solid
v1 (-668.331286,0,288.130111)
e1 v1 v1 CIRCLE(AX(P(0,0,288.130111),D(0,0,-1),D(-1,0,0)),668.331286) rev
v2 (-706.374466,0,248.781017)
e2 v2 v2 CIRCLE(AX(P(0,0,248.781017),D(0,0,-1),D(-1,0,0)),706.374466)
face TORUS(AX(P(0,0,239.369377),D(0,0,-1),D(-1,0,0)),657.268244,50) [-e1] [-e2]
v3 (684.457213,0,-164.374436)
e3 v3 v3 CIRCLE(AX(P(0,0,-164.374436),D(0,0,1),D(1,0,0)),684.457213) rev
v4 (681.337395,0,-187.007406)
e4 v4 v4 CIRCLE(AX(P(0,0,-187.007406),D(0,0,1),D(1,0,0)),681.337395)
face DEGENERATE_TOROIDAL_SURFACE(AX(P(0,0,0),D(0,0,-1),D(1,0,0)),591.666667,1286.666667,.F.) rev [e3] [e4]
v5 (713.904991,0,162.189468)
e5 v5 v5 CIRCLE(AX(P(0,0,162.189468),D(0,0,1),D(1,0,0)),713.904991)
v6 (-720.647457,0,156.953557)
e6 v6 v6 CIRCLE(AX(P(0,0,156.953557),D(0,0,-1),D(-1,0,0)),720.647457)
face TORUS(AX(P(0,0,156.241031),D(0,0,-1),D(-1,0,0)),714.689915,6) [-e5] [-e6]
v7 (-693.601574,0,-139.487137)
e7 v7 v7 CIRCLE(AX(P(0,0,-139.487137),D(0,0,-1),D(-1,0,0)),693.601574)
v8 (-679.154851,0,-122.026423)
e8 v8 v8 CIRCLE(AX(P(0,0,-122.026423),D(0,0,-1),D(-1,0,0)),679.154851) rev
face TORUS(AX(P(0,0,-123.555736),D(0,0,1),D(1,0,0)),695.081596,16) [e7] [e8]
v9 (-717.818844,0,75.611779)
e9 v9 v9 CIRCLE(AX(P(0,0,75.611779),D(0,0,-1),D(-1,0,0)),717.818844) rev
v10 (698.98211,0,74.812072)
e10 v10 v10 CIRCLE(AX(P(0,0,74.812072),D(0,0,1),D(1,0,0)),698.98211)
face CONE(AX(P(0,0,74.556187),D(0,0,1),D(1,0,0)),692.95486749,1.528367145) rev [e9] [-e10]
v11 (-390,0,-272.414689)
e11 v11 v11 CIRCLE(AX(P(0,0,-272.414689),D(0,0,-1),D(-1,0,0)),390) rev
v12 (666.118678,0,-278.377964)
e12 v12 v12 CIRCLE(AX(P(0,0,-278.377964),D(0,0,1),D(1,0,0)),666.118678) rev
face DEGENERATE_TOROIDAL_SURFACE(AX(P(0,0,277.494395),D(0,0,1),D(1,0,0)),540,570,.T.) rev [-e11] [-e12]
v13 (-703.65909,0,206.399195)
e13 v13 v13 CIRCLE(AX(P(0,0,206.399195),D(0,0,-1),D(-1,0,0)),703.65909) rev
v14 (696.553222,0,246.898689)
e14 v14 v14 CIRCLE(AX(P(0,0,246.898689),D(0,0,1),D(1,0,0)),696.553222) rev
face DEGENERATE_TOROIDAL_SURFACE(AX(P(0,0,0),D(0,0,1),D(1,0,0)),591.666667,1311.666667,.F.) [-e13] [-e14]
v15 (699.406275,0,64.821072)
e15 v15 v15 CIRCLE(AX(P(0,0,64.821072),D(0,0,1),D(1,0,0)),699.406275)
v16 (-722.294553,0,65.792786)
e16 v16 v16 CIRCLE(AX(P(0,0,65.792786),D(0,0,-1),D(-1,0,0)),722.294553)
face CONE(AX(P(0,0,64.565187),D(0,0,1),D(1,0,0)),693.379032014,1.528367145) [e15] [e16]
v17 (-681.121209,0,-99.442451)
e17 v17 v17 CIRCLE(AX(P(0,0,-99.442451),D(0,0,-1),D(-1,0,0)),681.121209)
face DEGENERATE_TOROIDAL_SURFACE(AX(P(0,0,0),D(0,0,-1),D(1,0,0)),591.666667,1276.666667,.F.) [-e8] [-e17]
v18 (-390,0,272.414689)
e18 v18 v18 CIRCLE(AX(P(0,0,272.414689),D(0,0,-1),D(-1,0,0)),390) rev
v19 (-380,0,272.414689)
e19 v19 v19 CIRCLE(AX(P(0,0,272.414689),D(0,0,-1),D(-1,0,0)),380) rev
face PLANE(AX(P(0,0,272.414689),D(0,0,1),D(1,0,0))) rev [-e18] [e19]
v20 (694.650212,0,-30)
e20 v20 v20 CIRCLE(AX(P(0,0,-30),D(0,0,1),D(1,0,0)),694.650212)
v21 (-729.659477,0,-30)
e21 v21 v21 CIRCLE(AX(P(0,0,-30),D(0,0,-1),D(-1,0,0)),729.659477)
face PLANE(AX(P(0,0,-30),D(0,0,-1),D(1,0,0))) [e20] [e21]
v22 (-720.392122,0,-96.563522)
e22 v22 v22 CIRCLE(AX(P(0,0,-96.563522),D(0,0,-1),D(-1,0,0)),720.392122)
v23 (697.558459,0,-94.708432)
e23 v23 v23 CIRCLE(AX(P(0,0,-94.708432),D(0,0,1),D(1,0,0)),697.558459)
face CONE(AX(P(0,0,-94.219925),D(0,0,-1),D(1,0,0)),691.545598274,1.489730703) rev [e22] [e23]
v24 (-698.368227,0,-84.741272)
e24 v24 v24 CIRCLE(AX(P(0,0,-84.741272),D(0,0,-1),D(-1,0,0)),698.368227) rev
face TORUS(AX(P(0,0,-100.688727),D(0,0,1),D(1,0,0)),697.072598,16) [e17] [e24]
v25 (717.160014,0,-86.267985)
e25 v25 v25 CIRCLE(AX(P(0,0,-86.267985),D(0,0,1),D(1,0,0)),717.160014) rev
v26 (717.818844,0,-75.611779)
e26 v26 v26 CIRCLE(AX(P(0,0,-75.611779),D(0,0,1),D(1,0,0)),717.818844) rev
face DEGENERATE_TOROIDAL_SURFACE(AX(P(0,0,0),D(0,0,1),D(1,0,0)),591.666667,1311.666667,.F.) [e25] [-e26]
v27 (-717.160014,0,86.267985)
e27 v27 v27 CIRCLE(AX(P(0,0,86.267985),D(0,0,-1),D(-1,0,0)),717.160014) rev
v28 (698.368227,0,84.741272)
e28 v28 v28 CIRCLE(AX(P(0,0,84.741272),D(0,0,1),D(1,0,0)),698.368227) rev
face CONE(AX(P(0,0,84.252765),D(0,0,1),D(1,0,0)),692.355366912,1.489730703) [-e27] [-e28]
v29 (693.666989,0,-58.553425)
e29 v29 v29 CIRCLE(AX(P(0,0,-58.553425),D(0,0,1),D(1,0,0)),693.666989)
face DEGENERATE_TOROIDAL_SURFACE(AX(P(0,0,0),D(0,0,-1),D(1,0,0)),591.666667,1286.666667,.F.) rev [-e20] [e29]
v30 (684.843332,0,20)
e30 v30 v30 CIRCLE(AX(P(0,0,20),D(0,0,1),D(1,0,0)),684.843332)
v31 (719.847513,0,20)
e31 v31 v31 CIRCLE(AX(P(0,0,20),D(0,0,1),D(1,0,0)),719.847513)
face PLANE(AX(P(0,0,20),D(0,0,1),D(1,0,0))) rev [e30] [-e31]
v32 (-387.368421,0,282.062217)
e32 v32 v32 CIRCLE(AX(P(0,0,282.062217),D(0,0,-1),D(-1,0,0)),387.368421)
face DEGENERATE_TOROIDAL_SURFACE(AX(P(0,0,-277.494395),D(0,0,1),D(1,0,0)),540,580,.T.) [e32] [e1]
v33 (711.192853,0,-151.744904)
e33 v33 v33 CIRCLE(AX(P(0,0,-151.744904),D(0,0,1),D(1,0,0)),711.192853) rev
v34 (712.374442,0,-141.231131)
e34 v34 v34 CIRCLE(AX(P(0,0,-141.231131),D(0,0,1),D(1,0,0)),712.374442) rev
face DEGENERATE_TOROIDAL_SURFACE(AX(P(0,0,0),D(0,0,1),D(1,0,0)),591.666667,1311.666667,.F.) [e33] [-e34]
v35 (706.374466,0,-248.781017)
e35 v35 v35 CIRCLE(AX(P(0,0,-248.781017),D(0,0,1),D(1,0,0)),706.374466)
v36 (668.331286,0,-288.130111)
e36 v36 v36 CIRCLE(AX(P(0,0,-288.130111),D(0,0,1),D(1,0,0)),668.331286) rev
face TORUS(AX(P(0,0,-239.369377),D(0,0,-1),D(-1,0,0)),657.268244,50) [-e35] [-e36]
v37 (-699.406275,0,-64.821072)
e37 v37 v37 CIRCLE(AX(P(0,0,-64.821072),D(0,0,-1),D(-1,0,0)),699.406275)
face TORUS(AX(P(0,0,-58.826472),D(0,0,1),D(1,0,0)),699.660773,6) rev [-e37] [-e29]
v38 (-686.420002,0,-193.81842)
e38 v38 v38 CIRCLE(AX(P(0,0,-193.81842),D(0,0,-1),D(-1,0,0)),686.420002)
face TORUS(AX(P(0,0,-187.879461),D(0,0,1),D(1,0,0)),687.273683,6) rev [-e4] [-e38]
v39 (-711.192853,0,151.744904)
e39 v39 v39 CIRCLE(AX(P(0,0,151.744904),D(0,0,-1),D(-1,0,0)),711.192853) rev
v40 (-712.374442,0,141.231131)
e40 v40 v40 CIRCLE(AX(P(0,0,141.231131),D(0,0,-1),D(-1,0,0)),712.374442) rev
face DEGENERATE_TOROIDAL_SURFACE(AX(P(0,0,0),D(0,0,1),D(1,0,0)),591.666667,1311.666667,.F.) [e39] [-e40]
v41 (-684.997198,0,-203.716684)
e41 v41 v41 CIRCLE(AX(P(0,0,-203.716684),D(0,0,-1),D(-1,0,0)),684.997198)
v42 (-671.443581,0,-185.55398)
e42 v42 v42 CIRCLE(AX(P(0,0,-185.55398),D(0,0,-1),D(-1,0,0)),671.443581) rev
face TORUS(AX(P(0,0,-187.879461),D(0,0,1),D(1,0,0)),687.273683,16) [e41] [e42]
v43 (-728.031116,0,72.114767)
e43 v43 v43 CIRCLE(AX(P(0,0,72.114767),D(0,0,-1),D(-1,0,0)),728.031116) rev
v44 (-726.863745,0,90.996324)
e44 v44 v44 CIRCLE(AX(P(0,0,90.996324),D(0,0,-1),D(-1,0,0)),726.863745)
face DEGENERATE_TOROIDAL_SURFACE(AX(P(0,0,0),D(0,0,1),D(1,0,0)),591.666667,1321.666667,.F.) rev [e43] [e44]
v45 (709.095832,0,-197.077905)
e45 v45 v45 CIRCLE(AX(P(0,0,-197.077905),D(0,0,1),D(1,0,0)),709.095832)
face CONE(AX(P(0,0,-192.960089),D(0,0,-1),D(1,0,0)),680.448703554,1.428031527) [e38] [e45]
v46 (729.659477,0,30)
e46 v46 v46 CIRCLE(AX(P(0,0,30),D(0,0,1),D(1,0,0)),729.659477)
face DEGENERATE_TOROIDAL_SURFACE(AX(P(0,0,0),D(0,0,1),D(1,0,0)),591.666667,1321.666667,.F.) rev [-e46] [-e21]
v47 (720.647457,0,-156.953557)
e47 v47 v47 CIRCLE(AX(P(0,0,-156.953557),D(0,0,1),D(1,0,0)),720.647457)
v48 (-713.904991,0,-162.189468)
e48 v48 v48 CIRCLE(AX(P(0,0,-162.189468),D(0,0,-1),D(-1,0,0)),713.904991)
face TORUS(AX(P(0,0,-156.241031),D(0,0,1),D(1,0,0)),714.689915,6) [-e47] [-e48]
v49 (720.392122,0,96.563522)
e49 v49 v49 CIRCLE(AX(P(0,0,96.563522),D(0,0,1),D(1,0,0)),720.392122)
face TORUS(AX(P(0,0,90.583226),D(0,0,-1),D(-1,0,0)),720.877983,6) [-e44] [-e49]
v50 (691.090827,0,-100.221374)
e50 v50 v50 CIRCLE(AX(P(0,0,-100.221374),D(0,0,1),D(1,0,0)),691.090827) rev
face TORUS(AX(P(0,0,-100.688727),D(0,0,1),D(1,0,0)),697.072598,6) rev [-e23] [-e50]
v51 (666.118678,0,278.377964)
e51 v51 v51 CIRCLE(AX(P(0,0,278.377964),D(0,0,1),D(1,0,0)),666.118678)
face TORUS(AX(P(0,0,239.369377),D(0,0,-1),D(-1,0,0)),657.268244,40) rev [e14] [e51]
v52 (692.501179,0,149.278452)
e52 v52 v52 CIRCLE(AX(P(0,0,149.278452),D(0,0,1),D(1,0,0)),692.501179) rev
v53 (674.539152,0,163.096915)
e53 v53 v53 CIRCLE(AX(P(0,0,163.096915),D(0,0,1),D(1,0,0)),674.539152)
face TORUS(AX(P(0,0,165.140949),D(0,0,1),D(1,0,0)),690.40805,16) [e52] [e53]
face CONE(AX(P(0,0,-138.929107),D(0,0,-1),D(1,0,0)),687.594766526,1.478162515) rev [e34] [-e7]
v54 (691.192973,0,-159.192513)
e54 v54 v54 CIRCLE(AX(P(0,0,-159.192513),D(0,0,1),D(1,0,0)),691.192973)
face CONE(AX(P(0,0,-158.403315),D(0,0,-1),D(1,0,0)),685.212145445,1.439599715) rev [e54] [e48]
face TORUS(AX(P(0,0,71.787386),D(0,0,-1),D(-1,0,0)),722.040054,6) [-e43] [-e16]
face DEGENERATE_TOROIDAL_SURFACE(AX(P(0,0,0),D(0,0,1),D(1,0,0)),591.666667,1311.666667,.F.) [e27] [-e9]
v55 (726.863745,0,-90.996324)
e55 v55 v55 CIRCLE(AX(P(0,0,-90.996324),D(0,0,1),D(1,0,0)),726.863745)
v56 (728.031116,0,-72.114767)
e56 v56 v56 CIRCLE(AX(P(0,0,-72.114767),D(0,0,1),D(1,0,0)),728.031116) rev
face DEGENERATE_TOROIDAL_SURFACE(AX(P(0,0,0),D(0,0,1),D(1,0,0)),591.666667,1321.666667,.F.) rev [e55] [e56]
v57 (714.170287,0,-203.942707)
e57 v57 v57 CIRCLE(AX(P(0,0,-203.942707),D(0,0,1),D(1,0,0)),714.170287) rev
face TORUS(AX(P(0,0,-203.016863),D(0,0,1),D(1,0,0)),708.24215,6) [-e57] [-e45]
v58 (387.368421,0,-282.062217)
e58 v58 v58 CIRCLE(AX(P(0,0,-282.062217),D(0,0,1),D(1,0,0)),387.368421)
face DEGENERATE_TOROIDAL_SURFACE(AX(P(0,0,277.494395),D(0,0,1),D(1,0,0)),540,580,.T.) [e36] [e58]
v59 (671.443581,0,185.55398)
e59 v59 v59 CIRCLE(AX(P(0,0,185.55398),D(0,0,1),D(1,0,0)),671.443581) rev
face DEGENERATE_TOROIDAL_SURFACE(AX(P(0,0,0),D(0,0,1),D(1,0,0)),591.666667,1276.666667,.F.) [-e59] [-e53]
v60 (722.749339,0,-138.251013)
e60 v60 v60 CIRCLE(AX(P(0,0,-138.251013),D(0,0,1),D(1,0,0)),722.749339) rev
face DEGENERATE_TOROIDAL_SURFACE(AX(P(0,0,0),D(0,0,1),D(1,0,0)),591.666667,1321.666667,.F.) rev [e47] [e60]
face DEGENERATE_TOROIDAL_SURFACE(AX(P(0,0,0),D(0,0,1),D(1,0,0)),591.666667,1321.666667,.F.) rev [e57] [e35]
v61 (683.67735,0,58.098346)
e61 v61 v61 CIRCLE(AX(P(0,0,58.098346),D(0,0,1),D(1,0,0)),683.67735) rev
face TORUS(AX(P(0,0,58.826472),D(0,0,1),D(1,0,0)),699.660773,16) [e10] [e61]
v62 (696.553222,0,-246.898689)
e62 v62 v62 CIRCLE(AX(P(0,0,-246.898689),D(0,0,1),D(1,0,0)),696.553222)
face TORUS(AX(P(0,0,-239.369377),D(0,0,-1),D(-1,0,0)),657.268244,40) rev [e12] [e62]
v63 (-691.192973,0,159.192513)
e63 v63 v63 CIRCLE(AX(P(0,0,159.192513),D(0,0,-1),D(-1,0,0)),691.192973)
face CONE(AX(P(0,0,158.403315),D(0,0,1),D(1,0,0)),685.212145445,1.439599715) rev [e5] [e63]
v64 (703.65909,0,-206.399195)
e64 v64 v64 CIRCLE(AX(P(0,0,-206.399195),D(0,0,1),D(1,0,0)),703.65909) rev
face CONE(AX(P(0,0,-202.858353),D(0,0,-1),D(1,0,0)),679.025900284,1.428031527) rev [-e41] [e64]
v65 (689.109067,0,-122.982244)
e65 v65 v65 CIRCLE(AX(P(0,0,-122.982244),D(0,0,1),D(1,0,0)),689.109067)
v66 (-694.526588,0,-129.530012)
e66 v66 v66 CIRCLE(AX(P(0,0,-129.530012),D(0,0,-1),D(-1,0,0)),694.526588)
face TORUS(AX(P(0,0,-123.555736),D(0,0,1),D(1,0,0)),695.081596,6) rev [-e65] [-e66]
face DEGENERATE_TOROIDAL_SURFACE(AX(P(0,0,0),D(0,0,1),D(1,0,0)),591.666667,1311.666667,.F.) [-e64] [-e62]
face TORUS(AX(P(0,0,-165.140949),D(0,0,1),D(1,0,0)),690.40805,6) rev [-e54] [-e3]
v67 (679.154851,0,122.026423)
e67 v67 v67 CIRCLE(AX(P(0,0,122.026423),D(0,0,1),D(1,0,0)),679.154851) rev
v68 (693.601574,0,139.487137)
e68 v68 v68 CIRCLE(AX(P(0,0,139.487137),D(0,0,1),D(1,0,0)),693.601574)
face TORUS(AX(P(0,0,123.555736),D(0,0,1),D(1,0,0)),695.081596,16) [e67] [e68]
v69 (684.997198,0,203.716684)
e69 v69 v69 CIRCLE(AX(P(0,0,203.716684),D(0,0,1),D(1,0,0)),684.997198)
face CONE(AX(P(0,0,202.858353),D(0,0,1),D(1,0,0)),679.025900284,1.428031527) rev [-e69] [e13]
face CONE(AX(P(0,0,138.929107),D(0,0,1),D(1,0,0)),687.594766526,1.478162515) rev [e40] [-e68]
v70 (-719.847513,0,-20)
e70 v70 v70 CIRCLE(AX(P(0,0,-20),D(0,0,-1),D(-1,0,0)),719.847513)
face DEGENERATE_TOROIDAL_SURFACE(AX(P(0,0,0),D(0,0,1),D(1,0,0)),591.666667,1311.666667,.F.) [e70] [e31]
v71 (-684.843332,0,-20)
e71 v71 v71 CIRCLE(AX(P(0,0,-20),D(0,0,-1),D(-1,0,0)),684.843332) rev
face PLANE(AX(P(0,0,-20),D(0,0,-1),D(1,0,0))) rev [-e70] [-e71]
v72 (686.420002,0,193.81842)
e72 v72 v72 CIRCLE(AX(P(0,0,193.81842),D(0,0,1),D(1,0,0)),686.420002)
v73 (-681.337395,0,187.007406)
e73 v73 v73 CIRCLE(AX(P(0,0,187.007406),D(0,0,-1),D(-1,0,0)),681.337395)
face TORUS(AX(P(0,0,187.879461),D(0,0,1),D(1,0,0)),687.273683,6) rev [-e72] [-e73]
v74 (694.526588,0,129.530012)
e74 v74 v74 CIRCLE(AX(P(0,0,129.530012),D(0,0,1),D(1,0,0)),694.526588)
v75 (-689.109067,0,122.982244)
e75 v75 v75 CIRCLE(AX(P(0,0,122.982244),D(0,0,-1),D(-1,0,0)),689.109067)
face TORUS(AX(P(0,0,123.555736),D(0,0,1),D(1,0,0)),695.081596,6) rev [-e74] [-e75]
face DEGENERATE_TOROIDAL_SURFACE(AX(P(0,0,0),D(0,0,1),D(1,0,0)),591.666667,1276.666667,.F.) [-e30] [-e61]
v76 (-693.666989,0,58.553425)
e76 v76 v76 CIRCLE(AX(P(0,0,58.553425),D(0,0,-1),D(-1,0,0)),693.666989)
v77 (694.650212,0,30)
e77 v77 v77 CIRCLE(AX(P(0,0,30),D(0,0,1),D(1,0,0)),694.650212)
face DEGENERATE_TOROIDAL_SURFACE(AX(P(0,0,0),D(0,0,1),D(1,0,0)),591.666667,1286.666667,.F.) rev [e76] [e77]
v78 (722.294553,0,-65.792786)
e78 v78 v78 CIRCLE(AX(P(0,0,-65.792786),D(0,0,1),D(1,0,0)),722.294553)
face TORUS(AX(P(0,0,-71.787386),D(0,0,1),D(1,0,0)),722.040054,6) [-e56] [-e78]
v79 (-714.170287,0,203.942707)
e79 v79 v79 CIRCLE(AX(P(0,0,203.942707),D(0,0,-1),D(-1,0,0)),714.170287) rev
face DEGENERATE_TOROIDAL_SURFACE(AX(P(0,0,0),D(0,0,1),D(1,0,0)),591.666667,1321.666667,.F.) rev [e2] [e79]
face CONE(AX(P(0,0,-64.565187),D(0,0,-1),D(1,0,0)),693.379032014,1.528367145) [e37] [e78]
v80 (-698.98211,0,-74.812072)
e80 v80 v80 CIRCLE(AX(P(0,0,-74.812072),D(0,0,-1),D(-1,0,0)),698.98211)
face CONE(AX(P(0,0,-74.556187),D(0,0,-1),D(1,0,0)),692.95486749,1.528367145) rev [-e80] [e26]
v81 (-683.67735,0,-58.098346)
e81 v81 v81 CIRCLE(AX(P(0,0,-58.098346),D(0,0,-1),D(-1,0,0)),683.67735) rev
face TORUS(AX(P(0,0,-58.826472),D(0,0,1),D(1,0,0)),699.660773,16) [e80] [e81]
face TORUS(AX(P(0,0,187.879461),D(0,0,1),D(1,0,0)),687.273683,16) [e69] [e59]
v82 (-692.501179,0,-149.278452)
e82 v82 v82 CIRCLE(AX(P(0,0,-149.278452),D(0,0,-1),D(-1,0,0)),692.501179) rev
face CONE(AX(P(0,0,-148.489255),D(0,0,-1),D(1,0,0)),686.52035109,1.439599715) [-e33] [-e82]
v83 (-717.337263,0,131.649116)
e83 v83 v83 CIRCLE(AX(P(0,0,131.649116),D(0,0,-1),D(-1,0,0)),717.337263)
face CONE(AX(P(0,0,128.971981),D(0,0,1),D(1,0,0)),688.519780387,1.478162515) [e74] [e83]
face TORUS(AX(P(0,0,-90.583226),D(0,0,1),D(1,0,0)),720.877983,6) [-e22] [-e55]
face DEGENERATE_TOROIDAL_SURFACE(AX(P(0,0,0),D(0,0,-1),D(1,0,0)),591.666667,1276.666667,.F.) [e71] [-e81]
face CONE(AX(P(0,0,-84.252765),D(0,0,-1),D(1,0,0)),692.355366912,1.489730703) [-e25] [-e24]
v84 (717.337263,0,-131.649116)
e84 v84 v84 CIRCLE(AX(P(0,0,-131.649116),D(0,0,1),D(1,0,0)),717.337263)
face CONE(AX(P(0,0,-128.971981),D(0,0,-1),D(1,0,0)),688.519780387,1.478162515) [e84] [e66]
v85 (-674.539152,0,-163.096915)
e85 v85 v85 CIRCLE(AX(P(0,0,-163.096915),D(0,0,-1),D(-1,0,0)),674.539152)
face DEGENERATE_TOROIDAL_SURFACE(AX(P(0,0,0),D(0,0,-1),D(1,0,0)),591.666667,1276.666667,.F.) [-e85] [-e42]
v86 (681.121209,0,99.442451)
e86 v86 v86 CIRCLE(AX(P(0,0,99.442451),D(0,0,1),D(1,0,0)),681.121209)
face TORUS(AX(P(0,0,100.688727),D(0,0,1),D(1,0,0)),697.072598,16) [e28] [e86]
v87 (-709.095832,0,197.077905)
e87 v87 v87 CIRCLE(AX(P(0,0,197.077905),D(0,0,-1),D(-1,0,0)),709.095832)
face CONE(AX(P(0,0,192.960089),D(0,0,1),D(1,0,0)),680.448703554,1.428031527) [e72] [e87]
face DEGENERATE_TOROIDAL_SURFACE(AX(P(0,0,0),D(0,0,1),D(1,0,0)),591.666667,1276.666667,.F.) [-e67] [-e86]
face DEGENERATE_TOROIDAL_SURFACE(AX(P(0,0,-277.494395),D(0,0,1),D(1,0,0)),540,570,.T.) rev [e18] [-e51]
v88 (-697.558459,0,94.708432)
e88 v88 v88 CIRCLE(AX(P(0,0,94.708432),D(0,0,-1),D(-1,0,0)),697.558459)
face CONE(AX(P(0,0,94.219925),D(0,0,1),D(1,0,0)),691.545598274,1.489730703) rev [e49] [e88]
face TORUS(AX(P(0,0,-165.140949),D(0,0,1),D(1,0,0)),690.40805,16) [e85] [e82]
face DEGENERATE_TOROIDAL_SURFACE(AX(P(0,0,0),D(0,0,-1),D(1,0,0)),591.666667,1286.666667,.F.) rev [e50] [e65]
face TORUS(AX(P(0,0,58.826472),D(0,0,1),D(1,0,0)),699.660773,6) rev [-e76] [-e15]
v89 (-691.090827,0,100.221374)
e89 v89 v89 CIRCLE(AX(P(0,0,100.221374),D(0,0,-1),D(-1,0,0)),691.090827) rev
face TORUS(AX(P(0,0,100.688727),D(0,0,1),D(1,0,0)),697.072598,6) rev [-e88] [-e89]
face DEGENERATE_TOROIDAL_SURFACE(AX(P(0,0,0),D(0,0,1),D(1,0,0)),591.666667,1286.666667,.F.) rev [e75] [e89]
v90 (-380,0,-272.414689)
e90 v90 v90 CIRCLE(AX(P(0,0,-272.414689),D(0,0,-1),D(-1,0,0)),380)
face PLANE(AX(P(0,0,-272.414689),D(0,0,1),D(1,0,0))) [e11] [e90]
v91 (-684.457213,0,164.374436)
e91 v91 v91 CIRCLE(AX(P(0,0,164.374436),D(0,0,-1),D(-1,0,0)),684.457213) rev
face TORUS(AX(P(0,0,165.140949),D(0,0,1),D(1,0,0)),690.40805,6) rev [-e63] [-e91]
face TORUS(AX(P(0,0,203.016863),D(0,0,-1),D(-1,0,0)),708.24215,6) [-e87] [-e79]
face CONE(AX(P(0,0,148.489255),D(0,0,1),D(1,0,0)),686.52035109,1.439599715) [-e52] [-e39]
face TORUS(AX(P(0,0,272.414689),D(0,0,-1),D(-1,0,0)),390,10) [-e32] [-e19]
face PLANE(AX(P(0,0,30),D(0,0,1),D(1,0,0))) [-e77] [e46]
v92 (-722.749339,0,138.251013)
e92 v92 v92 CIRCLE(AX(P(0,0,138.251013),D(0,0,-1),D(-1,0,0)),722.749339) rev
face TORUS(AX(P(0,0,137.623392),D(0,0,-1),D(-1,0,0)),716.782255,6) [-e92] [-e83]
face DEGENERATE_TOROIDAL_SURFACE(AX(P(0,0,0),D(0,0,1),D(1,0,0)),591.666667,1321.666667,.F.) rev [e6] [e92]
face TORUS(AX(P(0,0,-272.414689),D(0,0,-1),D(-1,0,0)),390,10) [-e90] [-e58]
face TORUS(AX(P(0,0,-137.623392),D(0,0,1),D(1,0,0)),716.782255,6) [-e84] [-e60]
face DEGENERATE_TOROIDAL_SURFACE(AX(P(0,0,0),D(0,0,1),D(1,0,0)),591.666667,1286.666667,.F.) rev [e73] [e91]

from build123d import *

# Parameters (mm, degrees)
FILLET1_R            = 6
FILLET2_R            = 6
FILLET1_OF_MIRROR1_R = 6
FILLET2_OF_MIRROR1_R = 6
FILLET3_R            = 50
FILLET4_R            = 10


# Read off the part's stored shape, not the designer's step: Cut-Revolve-Thin1, Shell1
with BuildPart() as part:
    # Sketch1 → Revolve1 (revolve)
    with BuildSketch(Plane(origin=(0, 0, 0), x_dir=(0, 0, -1), z_dir=(1, 0, 0)), mode=Mode.PRIVATE) as revolve1_sk:
        with BuildLine():
            Line((-280, 380), (280, 380))
            ThreePointArc((280, 380), (302.505605409, 540), (280, 700))
            ThreePointArc((280, 700), (0, 730), (-280, 700))
            ThreePointArc((-280, 700), (-302.505605409, 540), (-280, 380))
        make_face()
    revolve(revolve1_sk.sketch.rotate(Axis((0, 0, 583.128216784), (0, 0, -1)), 90), axis=Axis((0, 0, 583.128216784), (0, 0, -1)))

    # Cut-Revolve-Thin1 outline → Cut-Revolve-Thin1 (revolve, cut)
    with BuildSketch(Plane.XZ):
        with BuildLine():
            ThreePointArc((693.379032014, 64.565187316), (694.130775963, 47.286865379), (694.650211521, 30))
            Line((694.650211521, 30), (729.65947694, 30))
            Line((729.65947694, 30), (729.65947694, 66.049806803))
            Line((729.65947694, 66.049806803), (728.348560821, 66.049806803))
            Line((728.348560821, 66.049806803), (693.379032014, 64.565187316))
        make_face()
        with BuildLine():
            Line((726.43168337, 97.054198299), (726.43168337, 132.209624738))
            Line((726.43168337, 132.209624738), (723.370744552, 132.209624738))
            Line((723.370744552, 132.209624738), (688.519780387, 128.971981028))
            ThreePointArc((688.519780387, 128.971981028), (690.150467529, 111.60620768), (691.545598274, 94.219924732))
            Line((691.545598274, 94.219924732), (726.43168337, 97.054198299))
        make_face()
        with BuildLine():
            Line((685.212145445, 158.403315279), (719.912377901, 162.982169668))
            Line((719.912377901, 162.982169668), (719.912377901, 197.9400469))
            Line((719.912377901, 197.9400469), (715.093646325, 197.9400469))
            Line((715.093646325, 197.9400469), (680.448703554, 192.96008903))
            ThreePointArc((680.448703554, 192.96008903), (682.947540866, 175.697845936), (685.212145445, 158.403315279))
        make_face()
    cut_revolve_thin1 = revolve(axis=Axis((0, 0, 0), (0, 0, 1)), mode=Mode.SUBTRACT)

    # Fillet1
    fillet1_edges = [part.edges().sort_by_distance(p)[0] for p in [
        (-715.093646325, 0, 197.9400469),
        (-719.912377901, 0, 162.982169668),
        (-723.370744552, 0, 132.209624738),
        (-726.43168337, 0, 97.054198299),
        (-728.348560821, 0, 66.049806803),
    ]]
    fillet(fillet1_edges, radius=FILLET1_R)

    # Fillet2
    fillet2_edges = [part.edges().sort_by_distance(p)[0] for p in [
        (-685.212145445, 0, 158.403315279),
        (-680.448703554, 0, 192.96008903),
        (-691.545598274, 0, 94.219924732),
        (-688.519780387, 0, 128.971981028),
        (-693.379032014, 0, 64.565187316),
    ]]
    fillet(fillet2_edges, radius=FILLET2_R)

    # Mirror1: Cut-Revolve-Thin1 across plane
    add(cut_revolve_thin1.mirror(Plane.XY), mode=Mode.SUBTRACT)

    # Fillet1 of Mirror1
    fillet1_of_mirror1_edges = [part.edges().sort_by_distance(p)[0] for p in [
        (-715.093646325, 0, -197.9400469),
        (-719.912377901, 0, -162.982169668),
        (-723.370744552, 0, -132.209624738),
        (-726.43168337, 0, -97.054198299),
        (-728.348560821, 0, -66.049806803),
    ]]
    fillet(fillet1_of_mirror1_edges, radius=FILLET1_OF_MIRROR1_R)

    # Fillet2 of Mirror1
    fillet2_of_mirror1_edges = [part.edges().sort_by_distance(p)[0] for p in [
        (-685.212145445, 0, -158.403315279),
        (-680.448703554, 0, -192.96008903),
        (-691.545598274, 0, -94.219924732),
        (-688.519780387, 0, -128.971981028),
        (-693.379032014, 0, -64.565187316),
    ]]
    fillet(fillet2_of_mirror1_edges, radius=FILLET2_OF_MIRROR1_R)

    # Fillet3
    fillet3_edges = [part.edges().sort_by_distance(p)[0] for p in [
        (-700, 0, -280),
        (-700, 0, 280),
    ]]
    fillet(fillet3_edges, radius=FILLET3_R)

    # Fillet4
    fillet4_edges = [part.edges().sort_by_distance(p)[0] for p in [
        (-380, 0, 280),
        (-380, 0, -280),
    ]]
    fillet(fillet4_edges, radius=FILLET4_R)

    # Shell1 outline → Shell1 (revolve, cut)
    with BuildSketch(Plane.XZ):
        with BuildLine():
            Line((390, 272.414688804), (380, 272.414688804))
            Line((380, 272.414688804), (380, -272.414688804))
            Line((380, -272.414688804), (390, -272.414688804))
            ThreePointArc((390, -272.414688804), (527.692703475, -292.372721896), (666.118678014, -278.37796401))
            ThreePointArc((666.118678014, -278.37796401), (686.025689279, -267.172423462), (696.553222015, -246.898689445))
            ThreePointArc((696.553222015, -246.898689445), (700.264863332, -226.676788047), (703.659090413, -206.399194502))
            Line((703.659090413, -206.399194502), (684.997198231, -203.716683595))
            ThreePointArc((684.997198231, -203.716683595), (674.450537414, -197.448521985), (671.443581141, -185.553980449))
            ThreePointArc((671.443581141, -185.553980449), (673.041212828, -174.332318636), (674.539151585, -163.096914757))
            ThreePointArc((674.539151585, -163.096914757), (680.652003783, -152.459483564), (692.501178601, -149.278452205))
            Line((692.501178601, -149.278452205), (711.192853199, -151.744904162))
            ThreePointArc((711.192853199, -151.744904162), (711.794248036, -146.489208769), (712.374441647, -141.231130681))
            Line((712.374441647, -141.231130681), (693.6015737, -139.487137099))
            ThreePointArc((693.6015737, -139.487137099), (682.754065059, -133.755343255), (679.154851009, -122.026423331))
            ThreePointArc((679.154851009, -122.026423331), (680.188158196, -110.738801921), (681.121209082, -99.44245132))
            ThreePointArc((681.121209082, -99.44245132), (686.693340124, -88.512068892), (698.368227423, -84.74127177))
            Line((698.368227423, -84.74127177), (717.160013659, -86.26798544))
            ThreePointArc((717.160013659, -86.26798544), (717.500271268, -80.940552652), (717.818844247, -75.611779191))
            Line((717.818844247, -75.611779191), (698.982110108, -74.81207203))
            ThreePointArc((698.982110108, -74.81207203), (687.860627477, -69.631866584), (683.677349644, -58.098346265))
            ThreePointArc((683.677349644, -58.098346265), (684.402532075, -39.053524825), (684.843332424, -20))
            Line((684.843332424, -20), (719.847513373, -20))
            ThreePointArc((719.847513373, -20), (720, 0), (719.847513373, 20))
            Line((719.847513373, 20), (684.843332424, 20))
            ThreePointArc((684.843332424, 20), (684.402532075, 39.053524825), (683.677349644, 58.098346265))
            ThreePointArc((683.677349644, 58.098346265), (687.860627477, 69.631866584), (698.982110108, 74.81207203))
            Line((698.982110108, 74.81207203), (717.818844247, 75.611779191))
            ThreePointArc((717.818844247, 75.611779191), (717.500271268, 80.940552652), (717.160013659, 86.26798544))
            Line((717.160013659, 86.26798544), (698.368227423, 84.74127177))
            ThreePointArc((698.368227423, 84.74127177), (686.693340124, 88.512068892), (681.121209082, 99.44245132))
            ThreePointArc((681.121209082, 99.44245132), (680.188158196, 110.738801921), (679.154851009, 122.026423331))
            ThreePointArc((679.154851009, 122.026423331), (682.754065059, 133.755343255), (693.6015737, 139.487137099))
            Line((693.6015737, 139.487137099), (712.374441647, 141.231130681))
            ThreePointArc((712.374441647, 141.231130681), (711.794248036, 146.489208769), (711.192853199, 151.744904162))
            Line((711.192853199, 151.744904162), (692.501178601, 149.278452205))
            ThreePointArc((692.501178601, 149.278452205), (680.652003783, 152.459483564), (674.539151585, 163.096914757))
            ThreePointArc((674.539151585, 163.096914757), (673.041212828, 174.332318636), (671.443581141, 185.553980449))
            ThreePointArc((671.443581141, 185.553980449), (674.450537414, 197.448521985), (684.997198231, 203.716683595))
            Line((684.997198231, 203.716683595), (703.659090413, 206.399194502))
            ThreePointArc((703.659090413, 206.399194502), (700.264863332, 226.676788047), (696.553222015, 246.898689445))
            ThreePointArc((696.553222015, 246.898689445), (686.025689279, 267.172423462), (666.118678014, 278.37796401))
            ThreePointArc((666.118678014, 278.37796401), (527.692703475, 292.372721896), (390, 272.414688804))
        make_face()
    revolve(axis=Axis((0, 0, 0), (0, 0, 1)), mode=Mode.SUBTRACT)


solid = part.part
